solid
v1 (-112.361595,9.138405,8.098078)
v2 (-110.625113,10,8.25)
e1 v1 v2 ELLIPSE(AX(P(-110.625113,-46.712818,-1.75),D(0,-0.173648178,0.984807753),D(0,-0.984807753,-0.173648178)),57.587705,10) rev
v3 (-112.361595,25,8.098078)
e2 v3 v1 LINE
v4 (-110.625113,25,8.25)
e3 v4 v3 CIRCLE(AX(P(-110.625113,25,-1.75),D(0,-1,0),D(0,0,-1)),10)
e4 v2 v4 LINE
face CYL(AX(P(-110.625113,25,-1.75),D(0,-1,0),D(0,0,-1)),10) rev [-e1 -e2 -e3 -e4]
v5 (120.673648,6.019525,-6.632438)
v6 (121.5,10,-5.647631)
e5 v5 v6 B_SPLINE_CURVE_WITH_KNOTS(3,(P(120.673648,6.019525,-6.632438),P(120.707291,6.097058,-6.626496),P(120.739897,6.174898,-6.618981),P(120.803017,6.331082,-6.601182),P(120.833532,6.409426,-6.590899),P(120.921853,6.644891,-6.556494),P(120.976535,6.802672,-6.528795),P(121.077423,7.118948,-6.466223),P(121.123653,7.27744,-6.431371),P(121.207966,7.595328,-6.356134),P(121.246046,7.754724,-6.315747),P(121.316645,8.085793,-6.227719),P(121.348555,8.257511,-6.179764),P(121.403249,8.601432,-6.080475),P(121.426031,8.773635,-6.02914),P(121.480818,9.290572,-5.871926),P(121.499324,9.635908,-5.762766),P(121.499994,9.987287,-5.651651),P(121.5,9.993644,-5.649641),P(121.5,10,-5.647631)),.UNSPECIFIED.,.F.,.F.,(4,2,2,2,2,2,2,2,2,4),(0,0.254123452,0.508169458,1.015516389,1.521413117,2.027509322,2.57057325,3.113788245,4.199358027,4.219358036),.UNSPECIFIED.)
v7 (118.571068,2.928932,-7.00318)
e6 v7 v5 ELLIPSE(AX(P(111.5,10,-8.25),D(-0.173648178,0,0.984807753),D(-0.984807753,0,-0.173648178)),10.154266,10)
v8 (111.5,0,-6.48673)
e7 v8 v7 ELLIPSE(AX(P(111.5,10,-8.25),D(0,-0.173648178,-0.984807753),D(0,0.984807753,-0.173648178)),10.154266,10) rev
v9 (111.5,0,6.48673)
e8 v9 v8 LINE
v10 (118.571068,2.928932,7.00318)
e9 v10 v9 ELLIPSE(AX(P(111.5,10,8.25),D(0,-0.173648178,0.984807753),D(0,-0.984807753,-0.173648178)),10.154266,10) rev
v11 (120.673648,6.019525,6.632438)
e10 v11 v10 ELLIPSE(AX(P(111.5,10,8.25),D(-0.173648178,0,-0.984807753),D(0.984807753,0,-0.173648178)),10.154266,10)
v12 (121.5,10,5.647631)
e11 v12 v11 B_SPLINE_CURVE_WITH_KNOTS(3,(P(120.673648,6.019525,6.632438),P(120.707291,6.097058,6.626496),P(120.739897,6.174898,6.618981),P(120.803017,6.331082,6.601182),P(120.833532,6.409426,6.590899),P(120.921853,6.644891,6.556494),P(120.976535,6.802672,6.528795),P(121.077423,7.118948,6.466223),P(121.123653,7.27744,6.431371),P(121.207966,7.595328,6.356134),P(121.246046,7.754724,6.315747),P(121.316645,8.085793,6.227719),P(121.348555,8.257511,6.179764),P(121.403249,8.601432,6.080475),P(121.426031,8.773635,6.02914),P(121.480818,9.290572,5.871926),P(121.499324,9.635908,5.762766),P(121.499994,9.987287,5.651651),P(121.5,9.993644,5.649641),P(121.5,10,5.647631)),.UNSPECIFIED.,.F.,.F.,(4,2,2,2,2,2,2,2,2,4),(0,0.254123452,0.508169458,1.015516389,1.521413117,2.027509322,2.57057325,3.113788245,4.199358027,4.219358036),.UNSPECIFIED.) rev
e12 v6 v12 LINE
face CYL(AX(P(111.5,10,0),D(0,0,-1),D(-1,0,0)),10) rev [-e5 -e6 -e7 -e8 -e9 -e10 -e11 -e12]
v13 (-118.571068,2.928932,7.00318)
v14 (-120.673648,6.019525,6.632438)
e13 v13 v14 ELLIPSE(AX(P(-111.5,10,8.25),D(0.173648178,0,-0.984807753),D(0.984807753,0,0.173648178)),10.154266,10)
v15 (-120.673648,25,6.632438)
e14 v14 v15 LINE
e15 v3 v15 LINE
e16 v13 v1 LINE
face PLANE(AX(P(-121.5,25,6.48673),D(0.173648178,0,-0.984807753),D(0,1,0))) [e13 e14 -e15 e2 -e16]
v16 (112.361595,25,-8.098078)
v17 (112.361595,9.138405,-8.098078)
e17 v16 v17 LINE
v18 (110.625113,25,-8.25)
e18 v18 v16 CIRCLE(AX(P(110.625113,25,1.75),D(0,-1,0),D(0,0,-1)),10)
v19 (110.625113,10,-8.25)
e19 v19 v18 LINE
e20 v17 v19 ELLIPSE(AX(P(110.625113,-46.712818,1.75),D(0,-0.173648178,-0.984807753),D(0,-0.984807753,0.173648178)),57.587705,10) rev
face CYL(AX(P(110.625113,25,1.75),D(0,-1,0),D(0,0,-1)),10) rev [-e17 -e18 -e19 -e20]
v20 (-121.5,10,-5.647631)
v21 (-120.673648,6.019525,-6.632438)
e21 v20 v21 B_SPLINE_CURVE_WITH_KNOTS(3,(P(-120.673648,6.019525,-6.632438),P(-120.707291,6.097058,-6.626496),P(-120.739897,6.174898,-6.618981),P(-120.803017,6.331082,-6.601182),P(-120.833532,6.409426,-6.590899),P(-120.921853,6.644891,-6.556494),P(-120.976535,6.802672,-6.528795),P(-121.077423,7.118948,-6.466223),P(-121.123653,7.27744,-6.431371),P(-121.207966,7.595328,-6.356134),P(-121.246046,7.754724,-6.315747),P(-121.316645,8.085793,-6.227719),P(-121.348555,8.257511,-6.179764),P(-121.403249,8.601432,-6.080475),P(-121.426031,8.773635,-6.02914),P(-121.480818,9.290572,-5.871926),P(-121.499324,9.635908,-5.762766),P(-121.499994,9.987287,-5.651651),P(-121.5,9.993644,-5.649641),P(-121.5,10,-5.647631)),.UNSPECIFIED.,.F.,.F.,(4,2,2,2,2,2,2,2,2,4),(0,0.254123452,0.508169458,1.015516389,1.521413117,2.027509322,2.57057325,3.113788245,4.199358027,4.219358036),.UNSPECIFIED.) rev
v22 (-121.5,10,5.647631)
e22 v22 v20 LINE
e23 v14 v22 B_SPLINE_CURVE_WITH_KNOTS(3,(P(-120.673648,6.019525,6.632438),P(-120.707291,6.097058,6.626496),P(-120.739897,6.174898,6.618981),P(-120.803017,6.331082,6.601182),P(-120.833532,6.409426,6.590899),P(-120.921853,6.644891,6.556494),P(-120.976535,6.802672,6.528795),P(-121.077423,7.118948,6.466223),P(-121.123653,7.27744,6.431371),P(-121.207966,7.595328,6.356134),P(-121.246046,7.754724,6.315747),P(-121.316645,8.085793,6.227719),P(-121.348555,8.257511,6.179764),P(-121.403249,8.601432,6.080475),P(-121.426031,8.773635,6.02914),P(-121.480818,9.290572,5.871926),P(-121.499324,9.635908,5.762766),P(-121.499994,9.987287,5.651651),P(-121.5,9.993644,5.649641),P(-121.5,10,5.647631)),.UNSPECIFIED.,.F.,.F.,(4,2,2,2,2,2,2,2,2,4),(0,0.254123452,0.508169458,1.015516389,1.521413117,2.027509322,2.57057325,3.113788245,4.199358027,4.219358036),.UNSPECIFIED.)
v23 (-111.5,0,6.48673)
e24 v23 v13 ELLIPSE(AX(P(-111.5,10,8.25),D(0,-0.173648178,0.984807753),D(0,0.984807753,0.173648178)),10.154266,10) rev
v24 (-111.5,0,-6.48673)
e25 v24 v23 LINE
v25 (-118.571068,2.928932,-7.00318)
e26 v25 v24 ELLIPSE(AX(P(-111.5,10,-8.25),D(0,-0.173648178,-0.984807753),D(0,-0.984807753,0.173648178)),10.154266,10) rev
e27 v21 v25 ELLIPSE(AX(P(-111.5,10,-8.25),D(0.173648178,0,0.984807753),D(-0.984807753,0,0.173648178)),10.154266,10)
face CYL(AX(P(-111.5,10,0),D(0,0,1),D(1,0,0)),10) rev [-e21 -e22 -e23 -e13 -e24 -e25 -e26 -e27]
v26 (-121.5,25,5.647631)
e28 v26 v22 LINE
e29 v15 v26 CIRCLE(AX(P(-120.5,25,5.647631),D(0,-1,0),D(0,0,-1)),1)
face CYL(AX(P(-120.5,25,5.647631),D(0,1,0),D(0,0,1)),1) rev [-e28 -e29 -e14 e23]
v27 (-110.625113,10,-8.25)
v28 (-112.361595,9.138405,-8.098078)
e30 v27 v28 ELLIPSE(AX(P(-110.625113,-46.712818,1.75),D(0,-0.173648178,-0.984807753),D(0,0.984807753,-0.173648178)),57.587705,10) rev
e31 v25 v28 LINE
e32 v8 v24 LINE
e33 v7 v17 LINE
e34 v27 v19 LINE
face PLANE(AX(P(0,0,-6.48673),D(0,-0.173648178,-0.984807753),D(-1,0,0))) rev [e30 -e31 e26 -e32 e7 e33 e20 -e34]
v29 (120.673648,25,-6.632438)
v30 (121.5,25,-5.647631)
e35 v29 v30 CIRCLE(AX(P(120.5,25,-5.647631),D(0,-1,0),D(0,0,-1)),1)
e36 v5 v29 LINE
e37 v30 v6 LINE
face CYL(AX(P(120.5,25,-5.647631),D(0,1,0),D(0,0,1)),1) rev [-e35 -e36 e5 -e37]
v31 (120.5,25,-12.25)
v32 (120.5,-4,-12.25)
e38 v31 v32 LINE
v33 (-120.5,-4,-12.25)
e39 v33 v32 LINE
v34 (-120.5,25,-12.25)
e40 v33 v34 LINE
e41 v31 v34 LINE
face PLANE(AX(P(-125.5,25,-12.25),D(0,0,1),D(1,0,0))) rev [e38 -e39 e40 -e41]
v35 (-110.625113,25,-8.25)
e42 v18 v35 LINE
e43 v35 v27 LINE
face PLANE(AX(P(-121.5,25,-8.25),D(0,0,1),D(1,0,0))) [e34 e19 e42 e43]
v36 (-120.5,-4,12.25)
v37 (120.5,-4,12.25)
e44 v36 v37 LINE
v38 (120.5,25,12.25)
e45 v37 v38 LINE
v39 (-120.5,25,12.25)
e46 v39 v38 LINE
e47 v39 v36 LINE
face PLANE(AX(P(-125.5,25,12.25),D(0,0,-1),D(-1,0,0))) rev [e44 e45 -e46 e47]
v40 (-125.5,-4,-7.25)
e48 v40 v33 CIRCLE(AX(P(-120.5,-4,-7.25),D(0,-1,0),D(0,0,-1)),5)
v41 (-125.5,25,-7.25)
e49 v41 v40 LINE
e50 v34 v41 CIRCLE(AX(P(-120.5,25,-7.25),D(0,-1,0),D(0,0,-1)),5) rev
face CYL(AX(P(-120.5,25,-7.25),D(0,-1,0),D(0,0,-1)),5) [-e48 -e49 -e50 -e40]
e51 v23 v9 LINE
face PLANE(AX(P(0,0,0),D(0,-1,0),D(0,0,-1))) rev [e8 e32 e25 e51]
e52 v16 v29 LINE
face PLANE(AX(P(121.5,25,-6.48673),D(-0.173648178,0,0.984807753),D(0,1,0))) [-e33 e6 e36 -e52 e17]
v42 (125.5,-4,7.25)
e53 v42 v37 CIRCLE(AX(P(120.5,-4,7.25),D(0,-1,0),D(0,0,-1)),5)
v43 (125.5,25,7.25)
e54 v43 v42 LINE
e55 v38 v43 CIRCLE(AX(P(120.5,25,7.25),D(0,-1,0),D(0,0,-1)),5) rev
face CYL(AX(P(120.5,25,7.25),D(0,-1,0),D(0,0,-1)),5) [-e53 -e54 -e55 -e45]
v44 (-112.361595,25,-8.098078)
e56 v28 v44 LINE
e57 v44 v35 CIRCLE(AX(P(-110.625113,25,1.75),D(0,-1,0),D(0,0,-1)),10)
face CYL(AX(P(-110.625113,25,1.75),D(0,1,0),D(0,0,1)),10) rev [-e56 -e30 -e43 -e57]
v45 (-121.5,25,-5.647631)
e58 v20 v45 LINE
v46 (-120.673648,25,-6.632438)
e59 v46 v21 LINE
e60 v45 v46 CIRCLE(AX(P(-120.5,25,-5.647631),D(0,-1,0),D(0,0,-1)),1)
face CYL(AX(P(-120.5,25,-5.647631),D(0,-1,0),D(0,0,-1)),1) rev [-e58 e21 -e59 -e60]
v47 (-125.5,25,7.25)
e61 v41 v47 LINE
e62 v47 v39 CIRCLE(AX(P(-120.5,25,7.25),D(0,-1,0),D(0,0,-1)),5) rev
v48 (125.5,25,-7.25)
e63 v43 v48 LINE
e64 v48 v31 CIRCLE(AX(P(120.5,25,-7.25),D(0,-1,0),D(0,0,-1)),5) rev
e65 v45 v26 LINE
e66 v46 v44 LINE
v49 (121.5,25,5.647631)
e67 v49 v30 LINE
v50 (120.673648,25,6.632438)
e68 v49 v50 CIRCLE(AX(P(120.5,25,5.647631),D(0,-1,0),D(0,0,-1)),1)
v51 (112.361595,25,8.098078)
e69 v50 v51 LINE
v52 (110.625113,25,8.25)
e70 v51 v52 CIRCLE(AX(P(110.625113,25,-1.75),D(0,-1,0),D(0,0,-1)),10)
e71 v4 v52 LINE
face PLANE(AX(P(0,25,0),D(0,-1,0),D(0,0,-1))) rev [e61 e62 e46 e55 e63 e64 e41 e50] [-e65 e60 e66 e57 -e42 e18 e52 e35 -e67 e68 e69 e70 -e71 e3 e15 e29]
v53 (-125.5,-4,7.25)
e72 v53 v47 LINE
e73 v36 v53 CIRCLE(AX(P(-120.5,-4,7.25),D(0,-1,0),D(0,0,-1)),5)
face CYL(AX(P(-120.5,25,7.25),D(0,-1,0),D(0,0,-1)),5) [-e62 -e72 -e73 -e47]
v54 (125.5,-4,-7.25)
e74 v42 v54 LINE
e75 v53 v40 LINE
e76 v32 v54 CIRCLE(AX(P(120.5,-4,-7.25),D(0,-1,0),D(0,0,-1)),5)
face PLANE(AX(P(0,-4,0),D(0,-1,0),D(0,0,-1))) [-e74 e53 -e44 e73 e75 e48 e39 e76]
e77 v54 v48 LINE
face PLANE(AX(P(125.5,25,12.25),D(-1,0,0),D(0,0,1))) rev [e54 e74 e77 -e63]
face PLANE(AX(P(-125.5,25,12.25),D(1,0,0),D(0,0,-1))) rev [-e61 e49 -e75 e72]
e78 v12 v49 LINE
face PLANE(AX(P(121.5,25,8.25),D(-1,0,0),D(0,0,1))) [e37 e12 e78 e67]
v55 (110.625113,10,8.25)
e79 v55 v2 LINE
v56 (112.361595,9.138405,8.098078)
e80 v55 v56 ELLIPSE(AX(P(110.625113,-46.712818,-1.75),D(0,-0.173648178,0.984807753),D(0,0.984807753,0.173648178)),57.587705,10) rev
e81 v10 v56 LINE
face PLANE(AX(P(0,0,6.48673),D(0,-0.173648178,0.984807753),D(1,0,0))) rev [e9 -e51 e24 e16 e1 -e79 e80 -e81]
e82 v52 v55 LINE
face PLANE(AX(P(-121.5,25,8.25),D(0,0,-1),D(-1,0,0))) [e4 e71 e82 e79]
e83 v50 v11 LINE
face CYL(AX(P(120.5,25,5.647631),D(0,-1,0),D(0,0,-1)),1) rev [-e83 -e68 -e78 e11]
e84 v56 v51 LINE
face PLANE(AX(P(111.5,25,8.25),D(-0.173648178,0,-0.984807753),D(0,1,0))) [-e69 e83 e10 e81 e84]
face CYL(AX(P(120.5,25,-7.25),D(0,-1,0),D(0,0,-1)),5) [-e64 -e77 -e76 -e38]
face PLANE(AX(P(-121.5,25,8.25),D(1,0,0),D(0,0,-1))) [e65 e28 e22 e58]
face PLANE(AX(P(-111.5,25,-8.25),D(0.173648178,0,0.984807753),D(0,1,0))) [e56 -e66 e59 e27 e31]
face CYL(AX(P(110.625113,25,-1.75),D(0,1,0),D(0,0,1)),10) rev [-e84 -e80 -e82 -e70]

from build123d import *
from OCP.BRepFilletAPI import BRepFilletAPI_MakeChamfer

# Parameters (mm, degrees)
SKETCH1_W           = 251
SKETCH1_H           = 24.5
SKETCH1_W_2         = 243
SKETCH1_H_2         = 16.5
BOSS_EXTRUDE1_DEPTH = 25
SKETCH1_2_W         = 251
SKETCH1_2_H         = 24.5
BOSS_EXTRUDE2_DEPTH = 4
CHAMFER1_SIZE       = 10
CHAMFER1_SIZE2      = 1.763269807
FILLET1_R           = 10
FILLET2_R           = 1
FILLET4_R           = 10
FILLET5_R           = 5


with BuildPart() as part:
    # Sketch1 → Boss-Extrude1 (new body)
    with BuildSketch(Plane(origin=(0, 0, 0), x_dir=(1, 0, 0), z_dir=(0, 1, 0))):
        Rectangle(SKETCH1_W, SKETCH1_H)
        Rectangle(SKETCH1_W_2, SKETCH1_H_2, mode=Mode.SUBTRACT)
    extrude(amount=BOSS_EXTRUDE1_DEPTH)

    # Sketch1<2> → Boss-Extrude2 (add)
    with BuildSketch(Plane(origin=(0, 0, 0), x_dir=(1, 0, 0), z_dir=(0, 1, 0))):
        Rectangle(SKETCH1_2_W, SKETCH1_2_H)
    extrude(amount=-BOSS_EXTRUDE2_DEPTH)

    # Chamfer1: one chamfer whose edges measure the first distance from different faces: ONE call of the kernel's chamfer builder (chamfer() names one face for all edges)
    chamfer1_edges_1 = [part.edges().sort_by_distance(p)[0] for p in [
        (121.5, 12.5, 8.25),
        (0, 0, 8.25),
        (-121.5, 12.5, 8.25),
    ]]
    chamfer1_side_1 = [part.faces().sort_by_distance(p)[0] for p in [
        (0, 12.5, 8.25),
    ]]
    chamfer1_edges_2 = [part.edges().sort_by_distance(p)[0] for p in [
        (0, 0, -8.25),
        (121.5, 12.5, -8.25),
        (-121.5, 12.5, -8.25),
    ]]
    chamfer1_side_2 = [part.faces().sort_by_distance(p)[0] for p in [
        (0, 12.5, -8.25),
    ]]
    chamfer1 = BRepFilletAPI_MakeChamfer(part.part.solid().wrapped)
    for e in chamfer1_edges_1:
        chamfer1.Add(CHAMFER1_SIZE, CHAMFER1_SIZE2, e.wrapped, chamfer1_side_1[0].wrapped)  # the first distance lies on this face
    for e in chamfer1_edges_2:
        chamfer1.Add(CHAMFER1_SIZE, CHAMFER1_SIZE2, e.wrapped, chamfer1_side_2[0].wrapped)  # the first distance lies on this face
    add(Compound.cast(chamfer1.Shape()), mode=Mode.REPLACE)

    # Fillet1
    fillet1_edges = [part.edges().sort_by_distance(p)[0] for p in [
        (-111.5, 17.5, 8.25),
        (111.5, 17.5, 8.25),
        (111.5, 17.5, -8.25),
        (-111.5, 17.5, -8.25),
    ]]
    fillet(fillet1_edges, radius=FILLET1_R)

    # Fillet2
    fillet2_edges = [part.edges().sort_by_distance(p)[0] for p in [
        (121.5, 12.5, -6.486730193),
        (121.5, 12.5, 6.486730193),
        (-121.5, 12.5, -6.486730193),
        (-121.5, 12.5, 6.486730193),
    ]]
    fillet(fillet2_edges, radius=FILLET2_R)

    # Fillet4
    # the kernel refuses this fillet: 10 mm, written as the material it adds along each edge
    with BuildSketch(Plane(origin=(-121.5, 0, -30.647630562), x_dir=(0, 1, 0), z_dir=(0, 0, 1))) as fillet4_piece_1_section:
        with BuildLine():
            CenterArc((FILLET4_R, -FILLET4_R), FILLET4_R, 90, 90)
            Line((0, -FILLET4_R), (0, 0))
            Line((0, 0), (FILLET4_R, 0))
        make_face()
    fillet4_piece_1 = extrude(amount=61.295261123, mode=Mode.PRIVATE)
    fillet4_piece_1 = split(fillet4_piece_1, bisect_by=Plane(origin=(-119.266320611, 1.057029519, 6.673113017), z_dir=(0, 0.17364817766693139, -0.9848077530122079)), keep=Keep.TOP, mode=Mode.PRIVATE)
    fillet4_piece_1 = split(fillet4_piece_1, bisect_by=Plane(origin=(-119.266320611, 1.057029519, -6.673113017), z_dir=(0, 0.17364817766693139, 0.9848077530122079)), keep=Keep.TOP, mode=Mode.PRIVATE)
    add(fillet4_piece_1)
    with BuildSketch(Plane(origin=(121.5, 0, 30.647630562), x_dir=(0, 1, 0), z_dir=(0, 0, -1))) as fillet4_piece_2_section:
        with BuildLine():
            CenterArc((FILLET4_R, -FILLET4_R), FILLET4_R, 90, 90)
            Line((0, -FILLET4_R), (0, 0))
            Line((0, 0), (FILLET4_R, 0))
        make_face()
    fillet4_piece_2 = extrude(amount=61.295261123, mode=Mode.PRIVATE)
    fillet4_piece_2 = split(fillet4_piece_2, bisect_by=Plane(origin=(119.266320611, 1.057029519, 6.673113017), z_dir=(0, 0.17364817766693139, -0.9848077530122079)), keep=Keep.TOP, mode=Mode.PRIVATE)
    fillet4_piece_2 = split(fillet4_piece_2, bisect_by=Plane(origin=(119.266320611, 1.057029519, -6.673113017), z_dir=(0, 0.17364817766693139, 0.9848077530122079)), keep=Keep.TOP, mode=Mode.PRIVATE)
    add(fillet4_piece_2)

    # Fillet5
    fillet5_edges = [part.edges().sort_by_distance(p)[0] for p in [
        (-125.5, 10.5, -12.25),
        (125.5, 10.5, -12.25),
        (125.5, 10.5, 12.25),
        (-125.5, 10.5, 12.25),
    ]]
    fillet(fillet5_edges, radius=FILLET5_R)


solid = part.part
